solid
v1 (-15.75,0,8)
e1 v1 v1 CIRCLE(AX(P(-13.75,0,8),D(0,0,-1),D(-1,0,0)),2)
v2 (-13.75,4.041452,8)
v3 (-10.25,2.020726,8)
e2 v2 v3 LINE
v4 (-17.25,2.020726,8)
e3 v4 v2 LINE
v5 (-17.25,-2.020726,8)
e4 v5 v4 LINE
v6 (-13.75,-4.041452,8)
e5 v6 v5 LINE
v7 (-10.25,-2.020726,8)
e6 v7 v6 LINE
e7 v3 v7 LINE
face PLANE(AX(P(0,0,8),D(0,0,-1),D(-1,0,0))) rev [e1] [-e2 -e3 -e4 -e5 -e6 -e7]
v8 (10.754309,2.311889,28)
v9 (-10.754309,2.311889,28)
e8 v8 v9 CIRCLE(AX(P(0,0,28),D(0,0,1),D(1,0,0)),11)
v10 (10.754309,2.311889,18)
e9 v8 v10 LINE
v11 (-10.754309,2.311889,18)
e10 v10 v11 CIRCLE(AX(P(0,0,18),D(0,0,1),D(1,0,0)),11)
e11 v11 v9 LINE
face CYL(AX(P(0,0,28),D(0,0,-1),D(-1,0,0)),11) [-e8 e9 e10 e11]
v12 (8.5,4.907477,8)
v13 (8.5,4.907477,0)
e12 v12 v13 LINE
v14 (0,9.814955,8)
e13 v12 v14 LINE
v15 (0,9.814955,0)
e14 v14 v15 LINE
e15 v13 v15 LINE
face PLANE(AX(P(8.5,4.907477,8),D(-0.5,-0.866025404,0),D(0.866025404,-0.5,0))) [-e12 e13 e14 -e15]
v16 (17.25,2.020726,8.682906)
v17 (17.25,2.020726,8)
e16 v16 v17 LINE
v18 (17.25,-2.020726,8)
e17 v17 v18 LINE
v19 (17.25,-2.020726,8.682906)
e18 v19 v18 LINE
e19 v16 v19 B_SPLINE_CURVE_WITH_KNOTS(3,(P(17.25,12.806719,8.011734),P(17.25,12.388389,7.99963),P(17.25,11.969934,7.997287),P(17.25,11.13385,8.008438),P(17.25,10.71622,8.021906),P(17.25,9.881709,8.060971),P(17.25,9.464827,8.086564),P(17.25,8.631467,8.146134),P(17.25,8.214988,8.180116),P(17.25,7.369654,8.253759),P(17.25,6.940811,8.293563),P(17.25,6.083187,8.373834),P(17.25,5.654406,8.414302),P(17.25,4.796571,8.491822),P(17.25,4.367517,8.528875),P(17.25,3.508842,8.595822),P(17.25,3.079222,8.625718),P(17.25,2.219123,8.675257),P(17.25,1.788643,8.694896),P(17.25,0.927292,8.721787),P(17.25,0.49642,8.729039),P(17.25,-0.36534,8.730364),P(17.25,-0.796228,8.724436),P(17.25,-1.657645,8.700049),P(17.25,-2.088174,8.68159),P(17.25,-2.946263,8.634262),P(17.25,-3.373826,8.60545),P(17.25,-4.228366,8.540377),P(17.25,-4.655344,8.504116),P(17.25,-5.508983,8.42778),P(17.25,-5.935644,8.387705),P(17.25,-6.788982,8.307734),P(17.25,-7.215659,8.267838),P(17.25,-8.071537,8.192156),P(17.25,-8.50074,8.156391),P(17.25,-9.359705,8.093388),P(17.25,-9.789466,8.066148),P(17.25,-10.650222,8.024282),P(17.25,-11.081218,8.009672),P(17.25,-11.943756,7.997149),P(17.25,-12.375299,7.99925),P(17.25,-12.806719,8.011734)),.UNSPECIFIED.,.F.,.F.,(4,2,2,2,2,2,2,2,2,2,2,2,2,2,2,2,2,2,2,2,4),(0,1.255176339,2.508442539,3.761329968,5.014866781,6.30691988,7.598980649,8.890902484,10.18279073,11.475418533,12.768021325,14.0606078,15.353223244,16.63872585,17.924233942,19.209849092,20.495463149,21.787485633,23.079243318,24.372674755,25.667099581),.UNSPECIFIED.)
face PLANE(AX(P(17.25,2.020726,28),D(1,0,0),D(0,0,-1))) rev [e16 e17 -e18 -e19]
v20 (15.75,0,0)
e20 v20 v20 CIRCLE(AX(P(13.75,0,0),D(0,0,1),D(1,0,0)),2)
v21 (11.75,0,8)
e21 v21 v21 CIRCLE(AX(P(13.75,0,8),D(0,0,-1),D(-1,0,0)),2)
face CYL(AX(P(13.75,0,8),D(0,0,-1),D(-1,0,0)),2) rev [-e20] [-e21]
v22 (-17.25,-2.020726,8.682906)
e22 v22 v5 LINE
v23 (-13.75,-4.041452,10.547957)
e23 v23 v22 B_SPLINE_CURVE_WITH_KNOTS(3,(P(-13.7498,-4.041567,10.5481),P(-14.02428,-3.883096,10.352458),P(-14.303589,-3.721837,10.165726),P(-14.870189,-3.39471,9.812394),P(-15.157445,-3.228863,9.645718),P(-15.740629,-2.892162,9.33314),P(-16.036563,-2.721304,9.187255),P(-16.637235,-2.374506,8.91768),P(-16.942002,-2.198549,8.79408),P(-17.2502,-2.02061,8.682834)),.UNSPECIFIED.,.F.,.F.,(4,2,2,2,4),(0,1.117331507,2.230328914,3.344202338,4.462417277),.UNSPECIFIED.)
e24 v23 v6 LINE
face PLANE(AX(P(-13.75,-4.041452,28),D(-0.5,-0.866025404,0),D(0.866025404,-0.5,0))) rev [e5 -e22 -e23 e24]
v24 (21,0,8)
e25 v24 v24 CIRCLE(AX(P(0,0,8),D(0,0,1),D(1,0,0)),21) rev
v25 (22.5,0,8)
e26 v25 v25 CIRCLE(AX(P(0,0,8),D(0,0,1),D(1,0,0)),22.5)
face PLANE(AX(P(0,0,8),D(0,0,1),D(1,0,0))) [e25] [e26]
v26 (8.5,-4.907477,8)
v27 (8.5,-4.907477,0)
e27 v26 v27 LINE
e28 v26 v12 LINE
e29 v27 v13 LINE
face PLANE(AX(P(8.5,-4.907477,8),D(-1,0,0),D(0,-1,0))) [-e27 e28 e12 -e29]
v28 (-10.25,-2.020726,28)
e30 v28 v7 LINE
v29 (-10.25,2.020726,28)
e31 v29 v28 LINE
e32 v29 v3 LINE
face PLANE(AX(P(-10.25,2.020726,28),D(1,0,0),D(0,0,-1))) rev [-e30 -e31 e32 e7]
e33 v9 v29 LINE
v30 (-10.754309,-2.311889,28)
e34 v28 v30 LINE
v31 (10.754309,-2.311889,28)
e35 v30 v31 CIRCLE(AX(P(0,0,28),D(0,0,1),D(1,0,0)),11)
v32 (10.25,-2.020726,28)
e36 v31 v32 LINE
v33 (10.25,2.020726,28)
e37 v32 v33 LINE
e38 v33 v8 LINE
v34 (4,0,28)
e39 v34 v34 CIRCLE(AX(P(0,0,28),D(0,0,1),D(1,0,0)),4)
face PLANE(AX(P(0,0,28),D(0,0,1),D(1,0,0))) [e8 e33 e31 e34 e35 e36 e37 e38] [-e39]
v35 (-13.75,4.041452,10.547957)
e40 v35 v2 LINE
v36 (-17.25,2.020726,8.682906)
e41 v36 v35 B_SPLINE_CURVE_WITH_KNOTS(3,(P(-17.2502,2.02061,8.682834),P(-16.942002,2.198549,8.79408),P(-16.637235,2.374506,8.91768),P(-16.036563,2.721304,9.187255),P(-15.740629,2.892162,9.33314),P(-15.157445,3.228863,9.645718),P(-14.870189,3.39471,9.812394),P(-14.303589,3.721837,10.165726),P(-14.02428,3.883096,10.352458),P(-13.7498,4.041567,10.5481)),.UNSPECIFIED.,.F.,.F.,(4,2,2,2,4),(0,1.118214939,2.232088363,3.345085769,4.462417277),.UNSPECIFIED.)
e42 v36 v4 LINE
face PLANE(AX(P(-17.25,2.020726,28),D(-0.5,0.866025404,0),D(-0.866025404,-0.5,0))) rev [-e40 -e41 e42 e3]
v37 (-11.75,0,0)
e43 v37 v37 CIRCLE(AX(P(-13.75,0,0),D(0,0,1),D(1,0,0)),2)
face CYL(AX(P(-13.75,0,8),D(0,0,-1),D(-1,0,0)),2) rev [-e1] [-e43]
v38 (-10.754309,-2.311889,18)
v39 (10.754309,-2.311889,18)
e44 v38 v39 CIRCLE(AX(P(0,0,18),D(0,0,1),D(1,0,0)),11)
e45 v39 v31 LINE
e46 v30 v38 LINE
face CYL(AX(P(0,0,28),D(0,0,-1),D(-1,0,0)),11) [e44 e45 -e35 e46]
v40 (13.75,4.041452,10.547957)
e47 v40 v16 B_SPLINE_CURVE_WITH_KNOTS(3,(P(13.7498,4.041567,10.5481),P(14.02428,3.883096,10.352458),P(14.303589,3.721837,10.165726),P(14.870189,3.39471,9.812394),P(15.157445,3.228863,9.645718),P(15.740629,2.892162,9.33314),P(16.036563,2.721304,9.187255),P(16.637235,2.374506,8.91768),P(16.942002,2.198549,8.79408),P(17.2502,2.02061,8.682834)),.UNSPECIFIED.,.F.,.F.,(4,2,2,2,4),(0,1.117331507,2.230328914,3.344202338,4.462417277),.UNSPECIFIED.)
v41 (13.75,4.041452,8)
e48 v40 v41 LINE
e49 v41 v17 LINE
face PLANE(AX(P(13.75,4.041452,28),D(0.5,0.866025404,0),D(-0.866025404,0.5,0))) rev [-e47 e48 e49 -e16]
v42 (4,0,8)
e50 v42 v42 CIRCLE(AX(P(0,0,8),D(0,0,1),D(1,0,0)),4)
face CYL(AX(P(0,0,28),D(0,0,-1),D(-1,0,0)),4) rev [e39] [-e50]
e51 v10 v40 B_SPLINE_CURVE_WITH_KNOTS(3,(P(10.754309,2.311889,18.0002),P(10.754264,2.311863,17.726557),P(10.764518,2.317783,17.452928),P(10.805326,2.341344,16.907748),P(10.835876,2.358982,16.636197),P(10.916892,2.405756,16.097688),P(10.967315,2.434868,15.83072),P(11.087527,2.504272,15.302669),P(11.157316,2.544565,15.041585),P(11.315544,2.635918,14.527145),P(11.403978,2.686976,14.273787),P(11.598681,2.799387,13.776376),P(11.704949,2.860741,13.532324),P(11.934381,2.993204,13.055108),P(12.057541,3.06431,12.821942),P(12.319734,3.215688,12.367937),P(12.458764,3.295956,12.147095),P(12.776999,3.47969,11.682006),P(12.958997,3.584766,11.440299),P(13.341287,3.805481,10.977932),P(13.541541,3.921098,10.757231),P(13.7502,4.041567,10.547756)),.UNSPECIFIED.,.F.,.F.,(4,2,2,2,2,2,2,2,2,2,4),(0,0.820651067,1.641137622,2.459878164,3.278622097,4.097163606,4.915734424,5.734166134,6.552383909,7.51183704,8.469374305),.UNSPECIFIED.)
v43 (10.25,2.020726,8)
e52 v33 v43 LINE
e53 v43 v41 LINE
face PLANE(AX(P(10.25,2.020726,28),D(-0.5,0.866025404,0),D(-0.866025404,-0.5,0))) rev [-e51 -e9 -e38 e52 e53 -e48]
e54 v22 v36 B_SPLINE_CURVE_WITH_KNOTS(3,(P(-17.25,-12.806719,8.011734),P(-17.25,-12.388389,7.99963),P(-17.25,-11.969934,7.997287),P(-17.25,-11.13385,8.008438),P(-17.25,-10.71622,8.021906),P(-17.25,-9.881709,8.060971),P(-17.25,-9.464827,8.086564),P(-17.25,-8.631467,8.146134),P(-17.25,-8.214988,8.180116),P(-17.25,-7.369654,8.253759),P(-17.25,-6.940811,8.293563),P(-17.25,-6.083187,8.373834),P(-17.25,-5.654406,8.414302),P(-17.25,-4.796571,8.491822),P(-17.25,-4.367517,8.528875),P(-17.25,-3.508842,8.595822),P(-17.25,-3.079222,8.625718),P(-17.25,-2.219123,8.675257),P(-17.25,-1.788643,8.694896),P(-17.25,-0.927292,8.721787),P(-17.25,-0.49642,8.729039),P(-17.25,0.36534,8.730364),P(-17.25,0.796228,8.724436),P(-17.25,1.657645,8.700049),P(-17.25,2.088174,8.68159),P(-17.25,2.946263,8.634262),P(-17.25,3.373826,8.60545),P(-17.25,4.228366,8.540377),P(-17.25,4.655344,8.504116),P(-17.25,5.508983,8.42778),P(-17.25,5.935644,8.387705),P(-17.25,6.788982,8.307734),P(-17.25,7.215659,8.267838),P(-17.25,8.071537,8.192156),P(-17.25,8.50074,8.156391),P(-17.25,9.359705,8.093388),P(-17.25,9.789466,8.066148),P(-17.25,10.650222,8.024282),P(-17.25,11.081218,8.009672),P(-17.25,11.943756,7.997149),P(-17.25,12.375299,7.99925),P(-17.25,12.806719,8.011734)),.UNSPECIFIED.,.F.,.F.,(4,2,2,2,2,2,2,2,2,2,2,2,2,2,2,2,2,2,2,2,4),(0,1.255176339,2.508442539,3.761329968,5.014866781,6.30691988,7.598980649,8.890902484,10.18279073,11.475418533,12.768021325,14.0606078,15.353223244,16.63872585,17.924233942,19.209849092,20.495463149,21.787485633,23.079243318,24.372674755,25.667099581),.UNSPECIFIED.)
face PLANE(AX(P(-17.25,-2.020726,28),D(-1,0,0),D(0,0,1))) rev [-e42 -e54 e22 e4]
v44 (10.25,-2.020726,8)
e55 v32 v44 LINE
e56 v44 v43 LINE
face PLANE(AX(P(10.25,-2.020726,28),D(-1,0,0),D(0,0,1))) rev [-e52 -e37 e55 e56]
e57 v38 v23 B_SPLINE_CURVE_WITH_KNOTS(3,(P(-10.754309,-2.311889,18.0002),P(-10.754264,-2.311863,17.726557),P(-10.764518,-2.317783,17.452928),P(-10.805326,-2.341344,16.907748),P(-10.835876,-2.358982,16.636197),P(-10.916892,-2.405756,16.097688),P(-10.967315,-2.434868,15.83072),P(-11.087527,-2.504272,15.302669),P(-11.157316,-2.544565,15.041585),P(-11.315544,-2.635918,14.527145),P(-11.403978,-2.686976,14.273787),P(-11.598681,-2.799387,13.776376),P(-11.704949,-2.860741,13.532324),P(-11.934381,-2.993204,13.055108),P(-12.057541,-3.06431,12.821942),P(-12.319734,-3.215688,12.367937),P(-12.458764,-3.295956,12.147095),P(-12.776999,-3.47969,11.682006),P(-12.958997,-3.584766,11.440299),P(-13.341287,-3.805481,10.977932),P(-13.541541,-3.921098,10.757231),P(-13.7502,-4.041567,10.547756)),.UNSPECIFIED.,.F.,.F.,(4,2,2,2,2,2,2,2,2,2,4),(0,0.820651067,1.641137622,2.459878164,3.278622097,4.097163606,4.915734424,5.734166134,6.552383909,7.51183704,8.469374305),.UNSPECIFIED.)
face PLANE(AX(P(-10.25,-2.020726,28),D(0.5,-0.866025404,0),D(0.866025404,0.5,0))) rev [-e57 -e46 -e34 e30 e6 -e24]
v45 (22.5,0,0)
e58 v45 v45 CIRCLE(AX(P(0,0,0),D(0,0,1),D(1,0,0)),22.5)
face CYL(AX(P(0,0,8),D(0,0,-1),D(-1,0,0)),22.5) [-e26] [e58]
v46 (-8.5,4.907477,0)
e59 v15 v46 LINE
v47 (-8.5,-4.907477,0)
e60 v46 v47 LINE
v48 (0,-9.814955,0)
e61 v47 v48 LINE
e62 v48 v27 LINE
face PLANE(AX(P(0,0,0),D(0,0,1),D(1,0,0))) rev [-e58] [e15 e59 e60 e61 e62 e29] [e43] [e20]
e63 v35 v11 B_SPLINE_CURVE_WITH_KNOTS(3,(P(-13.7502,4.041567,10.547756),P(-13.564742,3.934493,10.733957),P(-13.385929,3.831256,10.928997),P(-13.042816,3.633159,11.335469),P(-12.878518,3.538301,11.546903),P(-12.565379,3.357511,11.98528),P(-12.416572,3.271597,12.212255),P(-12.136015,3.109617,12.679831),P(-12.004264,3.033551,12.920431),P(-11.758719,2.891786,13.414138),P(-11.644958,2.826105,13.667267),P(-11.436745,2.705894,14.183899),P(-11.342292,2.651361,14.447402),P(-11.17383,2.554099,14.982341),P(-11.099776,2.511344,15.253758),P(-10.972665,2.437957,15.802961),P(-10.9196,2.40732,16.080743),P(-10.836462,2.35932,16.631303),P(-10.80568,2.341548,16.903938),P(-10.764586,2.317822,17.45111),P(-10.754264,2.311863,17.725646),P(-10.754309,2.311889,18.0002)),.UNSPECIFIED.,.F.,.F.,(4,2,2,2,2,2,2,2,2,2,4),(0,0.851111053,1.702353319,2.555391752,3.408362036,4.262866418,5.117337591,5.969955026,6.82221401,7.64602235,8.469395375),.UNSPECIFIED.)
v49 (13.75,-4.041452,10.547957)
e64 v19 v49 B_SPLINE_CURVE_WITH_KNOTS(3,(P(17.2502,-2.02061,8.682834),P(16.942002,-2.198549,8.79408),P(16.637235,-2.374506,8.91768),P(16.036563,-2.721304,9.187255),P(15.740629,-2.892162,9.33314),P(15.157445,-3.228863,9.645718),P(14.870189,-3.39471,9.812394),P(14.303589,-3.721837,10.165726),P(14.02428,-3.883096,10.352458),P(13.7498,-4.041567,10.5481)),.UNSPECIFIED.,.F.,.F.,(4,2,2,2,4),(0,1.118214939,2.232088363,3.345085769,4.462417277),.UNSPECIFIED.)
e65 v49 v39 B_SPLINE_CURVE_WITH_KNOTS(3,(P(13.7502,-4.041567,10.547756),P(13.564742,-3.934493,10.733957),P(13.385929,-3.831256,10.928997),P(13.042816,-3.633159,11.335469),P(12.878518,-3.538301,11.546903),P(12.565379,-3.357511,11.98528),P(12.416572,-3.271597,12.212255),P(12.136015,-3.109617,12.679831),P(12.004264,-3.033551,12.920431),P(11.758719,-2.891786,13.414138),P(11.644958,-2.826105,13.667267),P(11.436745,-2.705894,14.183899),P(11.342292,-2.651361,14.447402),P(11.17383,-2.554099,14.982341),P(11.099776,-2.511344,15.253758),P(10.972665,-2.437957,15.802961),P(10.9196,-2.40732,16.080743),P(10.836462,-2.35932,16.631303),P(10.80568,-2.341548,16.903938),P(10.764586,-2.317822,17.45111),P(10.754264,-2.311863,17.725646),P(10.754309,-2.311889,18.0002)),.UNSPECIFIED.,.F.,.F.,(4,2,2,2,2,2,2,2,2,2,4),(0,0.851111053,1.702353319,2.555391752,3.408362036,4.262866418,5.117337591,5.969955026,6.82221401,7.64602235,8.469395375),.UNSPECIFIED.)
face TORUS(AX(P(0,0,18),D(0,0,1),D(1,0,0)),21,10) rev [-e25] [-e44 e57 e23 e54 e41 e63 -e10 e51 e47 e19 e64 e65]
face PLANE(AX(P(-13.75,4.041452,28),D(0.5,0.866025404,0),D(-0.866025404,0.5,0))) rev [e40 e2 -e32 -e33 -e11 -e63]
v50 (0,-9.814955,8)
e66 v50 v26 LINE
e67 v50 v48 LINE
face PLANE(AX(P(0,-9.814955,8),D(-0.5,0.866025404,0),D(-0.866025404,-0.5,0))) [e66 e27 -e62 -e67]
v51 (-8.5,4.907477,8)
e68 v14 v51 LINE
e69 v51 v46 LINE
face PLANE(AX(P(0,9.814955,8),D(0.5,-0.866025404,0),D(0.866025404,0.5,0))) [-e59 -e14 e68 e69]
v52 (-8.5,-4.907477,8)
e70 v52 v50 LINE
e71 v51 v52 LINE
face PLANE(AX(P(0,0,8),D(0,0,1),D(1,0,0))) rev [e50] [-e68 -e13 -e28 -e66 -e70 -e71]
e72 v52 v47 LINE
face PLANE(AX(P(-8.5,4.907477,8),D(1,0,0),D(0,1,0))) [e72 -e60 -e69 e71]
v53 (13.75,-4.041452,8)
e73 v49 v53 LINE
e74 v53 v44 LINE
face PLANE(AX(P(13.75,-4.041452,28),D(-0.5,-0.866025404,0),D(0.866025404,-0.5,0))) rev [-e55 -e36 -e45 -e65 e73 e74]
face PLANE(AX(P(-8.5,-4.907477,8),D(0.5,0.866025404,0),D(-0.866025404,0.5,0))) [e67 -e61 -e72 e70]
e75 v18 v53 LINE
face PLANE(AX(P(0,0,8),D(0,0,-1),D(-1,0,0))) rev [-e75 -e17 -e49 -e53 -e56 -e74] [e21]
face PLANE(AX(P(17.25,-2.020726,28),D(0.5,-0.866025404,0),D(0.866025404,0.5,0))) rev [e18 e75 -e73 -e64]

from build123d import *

# Parameters (mm, degrees)
SKETCH1_R           = 22.5
SKETCH1_R_2         = 2
BOSS_EXTRUDE1_DEPTH = 8
SKETCH2_R           = 11
SKETCH2_R_2         = 4
BOSS_EXTRUDE2_DEPTH = 20
FILLET1_R           = 10
CUT_EXTRUDE1_START  = -8
CUT_EXTRUDE1_DEPTH  = 35.385138905


with BuildPart() as part:
    # Sketch1 → Boss-Extrude1 (new body)
    with BuildSketch(Plane.XY):
        Circle(SKETCH1_R)
        with Locations((-13.75, 0)):
            Circle(SKETCH1_R_2, mode=Mode.SUBTRACT)
        with Locations((13.75, 0)):
            Circle(SKETCH1_R_2, mode=Mode.SUBTRACT)
        Polygon((0, 9.814954576), (-8.5, 4.907477288), (-8.5, -4.907477288), (0, -9.814954576), (8.5, -4.907477288), (8.5, 4.907477288), align=None, mode=Mode.SUBTRACT)
    extrude(amount=BOSS_EXTRUDE1_DEPTH)

    # Sketch2 → Boss-Extrude2 (add)
    with BuildSketch(Plane.XY.offset(8)):
        Circle(SKETCH2_R)
        Circle(SKETCH2_R_2, mode=Mode.SUBTRACT)
    extrude(amount=BOSS_EXTRUDE2_DEPTH)

    # Fillet1
    # the kernel refuses this fillet: 10 mm, written as the material it adds along each edge
    with BuildSketch(Plane(origin=(0, 0, 8), x_dir=(1, 0, 0), z_dir=(0, -1, 0))) as fillet1_piece_1_section:
        with BuildLine():
            CenterArc((11 + FILLET1_R, FILLET1_R), FILLET1_R, 180, 90)
            Line((11, FILLET1_R), (11, 0))
            Line((11, 0), (11 + FILLET1_R, 0))
        make_face()
    fillet1_piece_1 = revolve(axis=Axis((0, 0, 8), (0, 0, 1)), mode=Mode.PRIVATE)
    fillet1_piece_1 = fillet1_piece_1 - Plane(origin=(-13.75, 0, 8.218261163), x_dir=(1, 0, 0), z_dir=(0, 0, -1)) * Cylinder(2, 84, mode=Mode.PRIVATE)
    fillet1_piece_1 = fillet1_piece_1 - Plane(origin=(13.75, 0, 8.218261163), x_dir=(1, 0, 0), z_dir=(0, 0, -1)) * Cylinder(2, 84, mode=Mode.PRIVATE)
    add(fillet1_piece_1)

    # Sketch3 → Cut-Extrude1 (cut, through all)
    with BuildSketch(Plane(origin=(0, 0, 0), x_dir=(-1, 0, 0), z_dir=(0, 0, -1)).offset(CUT_EXTRUDE1_START)):
        Polygon((-13.75, 4.041451884), (-17.25, 2.020725942), (-17.25, -2.020725942), (-13.75, -4.041451884), (-10.25, -2.020725942), (-10.25, 2.020725942), align=None)
        Polygon((13.75, 4.041451884), (10.25, 2.020725942), (10.25, -2.020725942), (13.75, -4.041451884), (17.25, -2.020725942), (17.25, 2.020725942), align=None)
    extrude(amount=-CUT_EXTRUDE1_DEPTH, mode=Mode.SUBTRACT)


solid = part.part
